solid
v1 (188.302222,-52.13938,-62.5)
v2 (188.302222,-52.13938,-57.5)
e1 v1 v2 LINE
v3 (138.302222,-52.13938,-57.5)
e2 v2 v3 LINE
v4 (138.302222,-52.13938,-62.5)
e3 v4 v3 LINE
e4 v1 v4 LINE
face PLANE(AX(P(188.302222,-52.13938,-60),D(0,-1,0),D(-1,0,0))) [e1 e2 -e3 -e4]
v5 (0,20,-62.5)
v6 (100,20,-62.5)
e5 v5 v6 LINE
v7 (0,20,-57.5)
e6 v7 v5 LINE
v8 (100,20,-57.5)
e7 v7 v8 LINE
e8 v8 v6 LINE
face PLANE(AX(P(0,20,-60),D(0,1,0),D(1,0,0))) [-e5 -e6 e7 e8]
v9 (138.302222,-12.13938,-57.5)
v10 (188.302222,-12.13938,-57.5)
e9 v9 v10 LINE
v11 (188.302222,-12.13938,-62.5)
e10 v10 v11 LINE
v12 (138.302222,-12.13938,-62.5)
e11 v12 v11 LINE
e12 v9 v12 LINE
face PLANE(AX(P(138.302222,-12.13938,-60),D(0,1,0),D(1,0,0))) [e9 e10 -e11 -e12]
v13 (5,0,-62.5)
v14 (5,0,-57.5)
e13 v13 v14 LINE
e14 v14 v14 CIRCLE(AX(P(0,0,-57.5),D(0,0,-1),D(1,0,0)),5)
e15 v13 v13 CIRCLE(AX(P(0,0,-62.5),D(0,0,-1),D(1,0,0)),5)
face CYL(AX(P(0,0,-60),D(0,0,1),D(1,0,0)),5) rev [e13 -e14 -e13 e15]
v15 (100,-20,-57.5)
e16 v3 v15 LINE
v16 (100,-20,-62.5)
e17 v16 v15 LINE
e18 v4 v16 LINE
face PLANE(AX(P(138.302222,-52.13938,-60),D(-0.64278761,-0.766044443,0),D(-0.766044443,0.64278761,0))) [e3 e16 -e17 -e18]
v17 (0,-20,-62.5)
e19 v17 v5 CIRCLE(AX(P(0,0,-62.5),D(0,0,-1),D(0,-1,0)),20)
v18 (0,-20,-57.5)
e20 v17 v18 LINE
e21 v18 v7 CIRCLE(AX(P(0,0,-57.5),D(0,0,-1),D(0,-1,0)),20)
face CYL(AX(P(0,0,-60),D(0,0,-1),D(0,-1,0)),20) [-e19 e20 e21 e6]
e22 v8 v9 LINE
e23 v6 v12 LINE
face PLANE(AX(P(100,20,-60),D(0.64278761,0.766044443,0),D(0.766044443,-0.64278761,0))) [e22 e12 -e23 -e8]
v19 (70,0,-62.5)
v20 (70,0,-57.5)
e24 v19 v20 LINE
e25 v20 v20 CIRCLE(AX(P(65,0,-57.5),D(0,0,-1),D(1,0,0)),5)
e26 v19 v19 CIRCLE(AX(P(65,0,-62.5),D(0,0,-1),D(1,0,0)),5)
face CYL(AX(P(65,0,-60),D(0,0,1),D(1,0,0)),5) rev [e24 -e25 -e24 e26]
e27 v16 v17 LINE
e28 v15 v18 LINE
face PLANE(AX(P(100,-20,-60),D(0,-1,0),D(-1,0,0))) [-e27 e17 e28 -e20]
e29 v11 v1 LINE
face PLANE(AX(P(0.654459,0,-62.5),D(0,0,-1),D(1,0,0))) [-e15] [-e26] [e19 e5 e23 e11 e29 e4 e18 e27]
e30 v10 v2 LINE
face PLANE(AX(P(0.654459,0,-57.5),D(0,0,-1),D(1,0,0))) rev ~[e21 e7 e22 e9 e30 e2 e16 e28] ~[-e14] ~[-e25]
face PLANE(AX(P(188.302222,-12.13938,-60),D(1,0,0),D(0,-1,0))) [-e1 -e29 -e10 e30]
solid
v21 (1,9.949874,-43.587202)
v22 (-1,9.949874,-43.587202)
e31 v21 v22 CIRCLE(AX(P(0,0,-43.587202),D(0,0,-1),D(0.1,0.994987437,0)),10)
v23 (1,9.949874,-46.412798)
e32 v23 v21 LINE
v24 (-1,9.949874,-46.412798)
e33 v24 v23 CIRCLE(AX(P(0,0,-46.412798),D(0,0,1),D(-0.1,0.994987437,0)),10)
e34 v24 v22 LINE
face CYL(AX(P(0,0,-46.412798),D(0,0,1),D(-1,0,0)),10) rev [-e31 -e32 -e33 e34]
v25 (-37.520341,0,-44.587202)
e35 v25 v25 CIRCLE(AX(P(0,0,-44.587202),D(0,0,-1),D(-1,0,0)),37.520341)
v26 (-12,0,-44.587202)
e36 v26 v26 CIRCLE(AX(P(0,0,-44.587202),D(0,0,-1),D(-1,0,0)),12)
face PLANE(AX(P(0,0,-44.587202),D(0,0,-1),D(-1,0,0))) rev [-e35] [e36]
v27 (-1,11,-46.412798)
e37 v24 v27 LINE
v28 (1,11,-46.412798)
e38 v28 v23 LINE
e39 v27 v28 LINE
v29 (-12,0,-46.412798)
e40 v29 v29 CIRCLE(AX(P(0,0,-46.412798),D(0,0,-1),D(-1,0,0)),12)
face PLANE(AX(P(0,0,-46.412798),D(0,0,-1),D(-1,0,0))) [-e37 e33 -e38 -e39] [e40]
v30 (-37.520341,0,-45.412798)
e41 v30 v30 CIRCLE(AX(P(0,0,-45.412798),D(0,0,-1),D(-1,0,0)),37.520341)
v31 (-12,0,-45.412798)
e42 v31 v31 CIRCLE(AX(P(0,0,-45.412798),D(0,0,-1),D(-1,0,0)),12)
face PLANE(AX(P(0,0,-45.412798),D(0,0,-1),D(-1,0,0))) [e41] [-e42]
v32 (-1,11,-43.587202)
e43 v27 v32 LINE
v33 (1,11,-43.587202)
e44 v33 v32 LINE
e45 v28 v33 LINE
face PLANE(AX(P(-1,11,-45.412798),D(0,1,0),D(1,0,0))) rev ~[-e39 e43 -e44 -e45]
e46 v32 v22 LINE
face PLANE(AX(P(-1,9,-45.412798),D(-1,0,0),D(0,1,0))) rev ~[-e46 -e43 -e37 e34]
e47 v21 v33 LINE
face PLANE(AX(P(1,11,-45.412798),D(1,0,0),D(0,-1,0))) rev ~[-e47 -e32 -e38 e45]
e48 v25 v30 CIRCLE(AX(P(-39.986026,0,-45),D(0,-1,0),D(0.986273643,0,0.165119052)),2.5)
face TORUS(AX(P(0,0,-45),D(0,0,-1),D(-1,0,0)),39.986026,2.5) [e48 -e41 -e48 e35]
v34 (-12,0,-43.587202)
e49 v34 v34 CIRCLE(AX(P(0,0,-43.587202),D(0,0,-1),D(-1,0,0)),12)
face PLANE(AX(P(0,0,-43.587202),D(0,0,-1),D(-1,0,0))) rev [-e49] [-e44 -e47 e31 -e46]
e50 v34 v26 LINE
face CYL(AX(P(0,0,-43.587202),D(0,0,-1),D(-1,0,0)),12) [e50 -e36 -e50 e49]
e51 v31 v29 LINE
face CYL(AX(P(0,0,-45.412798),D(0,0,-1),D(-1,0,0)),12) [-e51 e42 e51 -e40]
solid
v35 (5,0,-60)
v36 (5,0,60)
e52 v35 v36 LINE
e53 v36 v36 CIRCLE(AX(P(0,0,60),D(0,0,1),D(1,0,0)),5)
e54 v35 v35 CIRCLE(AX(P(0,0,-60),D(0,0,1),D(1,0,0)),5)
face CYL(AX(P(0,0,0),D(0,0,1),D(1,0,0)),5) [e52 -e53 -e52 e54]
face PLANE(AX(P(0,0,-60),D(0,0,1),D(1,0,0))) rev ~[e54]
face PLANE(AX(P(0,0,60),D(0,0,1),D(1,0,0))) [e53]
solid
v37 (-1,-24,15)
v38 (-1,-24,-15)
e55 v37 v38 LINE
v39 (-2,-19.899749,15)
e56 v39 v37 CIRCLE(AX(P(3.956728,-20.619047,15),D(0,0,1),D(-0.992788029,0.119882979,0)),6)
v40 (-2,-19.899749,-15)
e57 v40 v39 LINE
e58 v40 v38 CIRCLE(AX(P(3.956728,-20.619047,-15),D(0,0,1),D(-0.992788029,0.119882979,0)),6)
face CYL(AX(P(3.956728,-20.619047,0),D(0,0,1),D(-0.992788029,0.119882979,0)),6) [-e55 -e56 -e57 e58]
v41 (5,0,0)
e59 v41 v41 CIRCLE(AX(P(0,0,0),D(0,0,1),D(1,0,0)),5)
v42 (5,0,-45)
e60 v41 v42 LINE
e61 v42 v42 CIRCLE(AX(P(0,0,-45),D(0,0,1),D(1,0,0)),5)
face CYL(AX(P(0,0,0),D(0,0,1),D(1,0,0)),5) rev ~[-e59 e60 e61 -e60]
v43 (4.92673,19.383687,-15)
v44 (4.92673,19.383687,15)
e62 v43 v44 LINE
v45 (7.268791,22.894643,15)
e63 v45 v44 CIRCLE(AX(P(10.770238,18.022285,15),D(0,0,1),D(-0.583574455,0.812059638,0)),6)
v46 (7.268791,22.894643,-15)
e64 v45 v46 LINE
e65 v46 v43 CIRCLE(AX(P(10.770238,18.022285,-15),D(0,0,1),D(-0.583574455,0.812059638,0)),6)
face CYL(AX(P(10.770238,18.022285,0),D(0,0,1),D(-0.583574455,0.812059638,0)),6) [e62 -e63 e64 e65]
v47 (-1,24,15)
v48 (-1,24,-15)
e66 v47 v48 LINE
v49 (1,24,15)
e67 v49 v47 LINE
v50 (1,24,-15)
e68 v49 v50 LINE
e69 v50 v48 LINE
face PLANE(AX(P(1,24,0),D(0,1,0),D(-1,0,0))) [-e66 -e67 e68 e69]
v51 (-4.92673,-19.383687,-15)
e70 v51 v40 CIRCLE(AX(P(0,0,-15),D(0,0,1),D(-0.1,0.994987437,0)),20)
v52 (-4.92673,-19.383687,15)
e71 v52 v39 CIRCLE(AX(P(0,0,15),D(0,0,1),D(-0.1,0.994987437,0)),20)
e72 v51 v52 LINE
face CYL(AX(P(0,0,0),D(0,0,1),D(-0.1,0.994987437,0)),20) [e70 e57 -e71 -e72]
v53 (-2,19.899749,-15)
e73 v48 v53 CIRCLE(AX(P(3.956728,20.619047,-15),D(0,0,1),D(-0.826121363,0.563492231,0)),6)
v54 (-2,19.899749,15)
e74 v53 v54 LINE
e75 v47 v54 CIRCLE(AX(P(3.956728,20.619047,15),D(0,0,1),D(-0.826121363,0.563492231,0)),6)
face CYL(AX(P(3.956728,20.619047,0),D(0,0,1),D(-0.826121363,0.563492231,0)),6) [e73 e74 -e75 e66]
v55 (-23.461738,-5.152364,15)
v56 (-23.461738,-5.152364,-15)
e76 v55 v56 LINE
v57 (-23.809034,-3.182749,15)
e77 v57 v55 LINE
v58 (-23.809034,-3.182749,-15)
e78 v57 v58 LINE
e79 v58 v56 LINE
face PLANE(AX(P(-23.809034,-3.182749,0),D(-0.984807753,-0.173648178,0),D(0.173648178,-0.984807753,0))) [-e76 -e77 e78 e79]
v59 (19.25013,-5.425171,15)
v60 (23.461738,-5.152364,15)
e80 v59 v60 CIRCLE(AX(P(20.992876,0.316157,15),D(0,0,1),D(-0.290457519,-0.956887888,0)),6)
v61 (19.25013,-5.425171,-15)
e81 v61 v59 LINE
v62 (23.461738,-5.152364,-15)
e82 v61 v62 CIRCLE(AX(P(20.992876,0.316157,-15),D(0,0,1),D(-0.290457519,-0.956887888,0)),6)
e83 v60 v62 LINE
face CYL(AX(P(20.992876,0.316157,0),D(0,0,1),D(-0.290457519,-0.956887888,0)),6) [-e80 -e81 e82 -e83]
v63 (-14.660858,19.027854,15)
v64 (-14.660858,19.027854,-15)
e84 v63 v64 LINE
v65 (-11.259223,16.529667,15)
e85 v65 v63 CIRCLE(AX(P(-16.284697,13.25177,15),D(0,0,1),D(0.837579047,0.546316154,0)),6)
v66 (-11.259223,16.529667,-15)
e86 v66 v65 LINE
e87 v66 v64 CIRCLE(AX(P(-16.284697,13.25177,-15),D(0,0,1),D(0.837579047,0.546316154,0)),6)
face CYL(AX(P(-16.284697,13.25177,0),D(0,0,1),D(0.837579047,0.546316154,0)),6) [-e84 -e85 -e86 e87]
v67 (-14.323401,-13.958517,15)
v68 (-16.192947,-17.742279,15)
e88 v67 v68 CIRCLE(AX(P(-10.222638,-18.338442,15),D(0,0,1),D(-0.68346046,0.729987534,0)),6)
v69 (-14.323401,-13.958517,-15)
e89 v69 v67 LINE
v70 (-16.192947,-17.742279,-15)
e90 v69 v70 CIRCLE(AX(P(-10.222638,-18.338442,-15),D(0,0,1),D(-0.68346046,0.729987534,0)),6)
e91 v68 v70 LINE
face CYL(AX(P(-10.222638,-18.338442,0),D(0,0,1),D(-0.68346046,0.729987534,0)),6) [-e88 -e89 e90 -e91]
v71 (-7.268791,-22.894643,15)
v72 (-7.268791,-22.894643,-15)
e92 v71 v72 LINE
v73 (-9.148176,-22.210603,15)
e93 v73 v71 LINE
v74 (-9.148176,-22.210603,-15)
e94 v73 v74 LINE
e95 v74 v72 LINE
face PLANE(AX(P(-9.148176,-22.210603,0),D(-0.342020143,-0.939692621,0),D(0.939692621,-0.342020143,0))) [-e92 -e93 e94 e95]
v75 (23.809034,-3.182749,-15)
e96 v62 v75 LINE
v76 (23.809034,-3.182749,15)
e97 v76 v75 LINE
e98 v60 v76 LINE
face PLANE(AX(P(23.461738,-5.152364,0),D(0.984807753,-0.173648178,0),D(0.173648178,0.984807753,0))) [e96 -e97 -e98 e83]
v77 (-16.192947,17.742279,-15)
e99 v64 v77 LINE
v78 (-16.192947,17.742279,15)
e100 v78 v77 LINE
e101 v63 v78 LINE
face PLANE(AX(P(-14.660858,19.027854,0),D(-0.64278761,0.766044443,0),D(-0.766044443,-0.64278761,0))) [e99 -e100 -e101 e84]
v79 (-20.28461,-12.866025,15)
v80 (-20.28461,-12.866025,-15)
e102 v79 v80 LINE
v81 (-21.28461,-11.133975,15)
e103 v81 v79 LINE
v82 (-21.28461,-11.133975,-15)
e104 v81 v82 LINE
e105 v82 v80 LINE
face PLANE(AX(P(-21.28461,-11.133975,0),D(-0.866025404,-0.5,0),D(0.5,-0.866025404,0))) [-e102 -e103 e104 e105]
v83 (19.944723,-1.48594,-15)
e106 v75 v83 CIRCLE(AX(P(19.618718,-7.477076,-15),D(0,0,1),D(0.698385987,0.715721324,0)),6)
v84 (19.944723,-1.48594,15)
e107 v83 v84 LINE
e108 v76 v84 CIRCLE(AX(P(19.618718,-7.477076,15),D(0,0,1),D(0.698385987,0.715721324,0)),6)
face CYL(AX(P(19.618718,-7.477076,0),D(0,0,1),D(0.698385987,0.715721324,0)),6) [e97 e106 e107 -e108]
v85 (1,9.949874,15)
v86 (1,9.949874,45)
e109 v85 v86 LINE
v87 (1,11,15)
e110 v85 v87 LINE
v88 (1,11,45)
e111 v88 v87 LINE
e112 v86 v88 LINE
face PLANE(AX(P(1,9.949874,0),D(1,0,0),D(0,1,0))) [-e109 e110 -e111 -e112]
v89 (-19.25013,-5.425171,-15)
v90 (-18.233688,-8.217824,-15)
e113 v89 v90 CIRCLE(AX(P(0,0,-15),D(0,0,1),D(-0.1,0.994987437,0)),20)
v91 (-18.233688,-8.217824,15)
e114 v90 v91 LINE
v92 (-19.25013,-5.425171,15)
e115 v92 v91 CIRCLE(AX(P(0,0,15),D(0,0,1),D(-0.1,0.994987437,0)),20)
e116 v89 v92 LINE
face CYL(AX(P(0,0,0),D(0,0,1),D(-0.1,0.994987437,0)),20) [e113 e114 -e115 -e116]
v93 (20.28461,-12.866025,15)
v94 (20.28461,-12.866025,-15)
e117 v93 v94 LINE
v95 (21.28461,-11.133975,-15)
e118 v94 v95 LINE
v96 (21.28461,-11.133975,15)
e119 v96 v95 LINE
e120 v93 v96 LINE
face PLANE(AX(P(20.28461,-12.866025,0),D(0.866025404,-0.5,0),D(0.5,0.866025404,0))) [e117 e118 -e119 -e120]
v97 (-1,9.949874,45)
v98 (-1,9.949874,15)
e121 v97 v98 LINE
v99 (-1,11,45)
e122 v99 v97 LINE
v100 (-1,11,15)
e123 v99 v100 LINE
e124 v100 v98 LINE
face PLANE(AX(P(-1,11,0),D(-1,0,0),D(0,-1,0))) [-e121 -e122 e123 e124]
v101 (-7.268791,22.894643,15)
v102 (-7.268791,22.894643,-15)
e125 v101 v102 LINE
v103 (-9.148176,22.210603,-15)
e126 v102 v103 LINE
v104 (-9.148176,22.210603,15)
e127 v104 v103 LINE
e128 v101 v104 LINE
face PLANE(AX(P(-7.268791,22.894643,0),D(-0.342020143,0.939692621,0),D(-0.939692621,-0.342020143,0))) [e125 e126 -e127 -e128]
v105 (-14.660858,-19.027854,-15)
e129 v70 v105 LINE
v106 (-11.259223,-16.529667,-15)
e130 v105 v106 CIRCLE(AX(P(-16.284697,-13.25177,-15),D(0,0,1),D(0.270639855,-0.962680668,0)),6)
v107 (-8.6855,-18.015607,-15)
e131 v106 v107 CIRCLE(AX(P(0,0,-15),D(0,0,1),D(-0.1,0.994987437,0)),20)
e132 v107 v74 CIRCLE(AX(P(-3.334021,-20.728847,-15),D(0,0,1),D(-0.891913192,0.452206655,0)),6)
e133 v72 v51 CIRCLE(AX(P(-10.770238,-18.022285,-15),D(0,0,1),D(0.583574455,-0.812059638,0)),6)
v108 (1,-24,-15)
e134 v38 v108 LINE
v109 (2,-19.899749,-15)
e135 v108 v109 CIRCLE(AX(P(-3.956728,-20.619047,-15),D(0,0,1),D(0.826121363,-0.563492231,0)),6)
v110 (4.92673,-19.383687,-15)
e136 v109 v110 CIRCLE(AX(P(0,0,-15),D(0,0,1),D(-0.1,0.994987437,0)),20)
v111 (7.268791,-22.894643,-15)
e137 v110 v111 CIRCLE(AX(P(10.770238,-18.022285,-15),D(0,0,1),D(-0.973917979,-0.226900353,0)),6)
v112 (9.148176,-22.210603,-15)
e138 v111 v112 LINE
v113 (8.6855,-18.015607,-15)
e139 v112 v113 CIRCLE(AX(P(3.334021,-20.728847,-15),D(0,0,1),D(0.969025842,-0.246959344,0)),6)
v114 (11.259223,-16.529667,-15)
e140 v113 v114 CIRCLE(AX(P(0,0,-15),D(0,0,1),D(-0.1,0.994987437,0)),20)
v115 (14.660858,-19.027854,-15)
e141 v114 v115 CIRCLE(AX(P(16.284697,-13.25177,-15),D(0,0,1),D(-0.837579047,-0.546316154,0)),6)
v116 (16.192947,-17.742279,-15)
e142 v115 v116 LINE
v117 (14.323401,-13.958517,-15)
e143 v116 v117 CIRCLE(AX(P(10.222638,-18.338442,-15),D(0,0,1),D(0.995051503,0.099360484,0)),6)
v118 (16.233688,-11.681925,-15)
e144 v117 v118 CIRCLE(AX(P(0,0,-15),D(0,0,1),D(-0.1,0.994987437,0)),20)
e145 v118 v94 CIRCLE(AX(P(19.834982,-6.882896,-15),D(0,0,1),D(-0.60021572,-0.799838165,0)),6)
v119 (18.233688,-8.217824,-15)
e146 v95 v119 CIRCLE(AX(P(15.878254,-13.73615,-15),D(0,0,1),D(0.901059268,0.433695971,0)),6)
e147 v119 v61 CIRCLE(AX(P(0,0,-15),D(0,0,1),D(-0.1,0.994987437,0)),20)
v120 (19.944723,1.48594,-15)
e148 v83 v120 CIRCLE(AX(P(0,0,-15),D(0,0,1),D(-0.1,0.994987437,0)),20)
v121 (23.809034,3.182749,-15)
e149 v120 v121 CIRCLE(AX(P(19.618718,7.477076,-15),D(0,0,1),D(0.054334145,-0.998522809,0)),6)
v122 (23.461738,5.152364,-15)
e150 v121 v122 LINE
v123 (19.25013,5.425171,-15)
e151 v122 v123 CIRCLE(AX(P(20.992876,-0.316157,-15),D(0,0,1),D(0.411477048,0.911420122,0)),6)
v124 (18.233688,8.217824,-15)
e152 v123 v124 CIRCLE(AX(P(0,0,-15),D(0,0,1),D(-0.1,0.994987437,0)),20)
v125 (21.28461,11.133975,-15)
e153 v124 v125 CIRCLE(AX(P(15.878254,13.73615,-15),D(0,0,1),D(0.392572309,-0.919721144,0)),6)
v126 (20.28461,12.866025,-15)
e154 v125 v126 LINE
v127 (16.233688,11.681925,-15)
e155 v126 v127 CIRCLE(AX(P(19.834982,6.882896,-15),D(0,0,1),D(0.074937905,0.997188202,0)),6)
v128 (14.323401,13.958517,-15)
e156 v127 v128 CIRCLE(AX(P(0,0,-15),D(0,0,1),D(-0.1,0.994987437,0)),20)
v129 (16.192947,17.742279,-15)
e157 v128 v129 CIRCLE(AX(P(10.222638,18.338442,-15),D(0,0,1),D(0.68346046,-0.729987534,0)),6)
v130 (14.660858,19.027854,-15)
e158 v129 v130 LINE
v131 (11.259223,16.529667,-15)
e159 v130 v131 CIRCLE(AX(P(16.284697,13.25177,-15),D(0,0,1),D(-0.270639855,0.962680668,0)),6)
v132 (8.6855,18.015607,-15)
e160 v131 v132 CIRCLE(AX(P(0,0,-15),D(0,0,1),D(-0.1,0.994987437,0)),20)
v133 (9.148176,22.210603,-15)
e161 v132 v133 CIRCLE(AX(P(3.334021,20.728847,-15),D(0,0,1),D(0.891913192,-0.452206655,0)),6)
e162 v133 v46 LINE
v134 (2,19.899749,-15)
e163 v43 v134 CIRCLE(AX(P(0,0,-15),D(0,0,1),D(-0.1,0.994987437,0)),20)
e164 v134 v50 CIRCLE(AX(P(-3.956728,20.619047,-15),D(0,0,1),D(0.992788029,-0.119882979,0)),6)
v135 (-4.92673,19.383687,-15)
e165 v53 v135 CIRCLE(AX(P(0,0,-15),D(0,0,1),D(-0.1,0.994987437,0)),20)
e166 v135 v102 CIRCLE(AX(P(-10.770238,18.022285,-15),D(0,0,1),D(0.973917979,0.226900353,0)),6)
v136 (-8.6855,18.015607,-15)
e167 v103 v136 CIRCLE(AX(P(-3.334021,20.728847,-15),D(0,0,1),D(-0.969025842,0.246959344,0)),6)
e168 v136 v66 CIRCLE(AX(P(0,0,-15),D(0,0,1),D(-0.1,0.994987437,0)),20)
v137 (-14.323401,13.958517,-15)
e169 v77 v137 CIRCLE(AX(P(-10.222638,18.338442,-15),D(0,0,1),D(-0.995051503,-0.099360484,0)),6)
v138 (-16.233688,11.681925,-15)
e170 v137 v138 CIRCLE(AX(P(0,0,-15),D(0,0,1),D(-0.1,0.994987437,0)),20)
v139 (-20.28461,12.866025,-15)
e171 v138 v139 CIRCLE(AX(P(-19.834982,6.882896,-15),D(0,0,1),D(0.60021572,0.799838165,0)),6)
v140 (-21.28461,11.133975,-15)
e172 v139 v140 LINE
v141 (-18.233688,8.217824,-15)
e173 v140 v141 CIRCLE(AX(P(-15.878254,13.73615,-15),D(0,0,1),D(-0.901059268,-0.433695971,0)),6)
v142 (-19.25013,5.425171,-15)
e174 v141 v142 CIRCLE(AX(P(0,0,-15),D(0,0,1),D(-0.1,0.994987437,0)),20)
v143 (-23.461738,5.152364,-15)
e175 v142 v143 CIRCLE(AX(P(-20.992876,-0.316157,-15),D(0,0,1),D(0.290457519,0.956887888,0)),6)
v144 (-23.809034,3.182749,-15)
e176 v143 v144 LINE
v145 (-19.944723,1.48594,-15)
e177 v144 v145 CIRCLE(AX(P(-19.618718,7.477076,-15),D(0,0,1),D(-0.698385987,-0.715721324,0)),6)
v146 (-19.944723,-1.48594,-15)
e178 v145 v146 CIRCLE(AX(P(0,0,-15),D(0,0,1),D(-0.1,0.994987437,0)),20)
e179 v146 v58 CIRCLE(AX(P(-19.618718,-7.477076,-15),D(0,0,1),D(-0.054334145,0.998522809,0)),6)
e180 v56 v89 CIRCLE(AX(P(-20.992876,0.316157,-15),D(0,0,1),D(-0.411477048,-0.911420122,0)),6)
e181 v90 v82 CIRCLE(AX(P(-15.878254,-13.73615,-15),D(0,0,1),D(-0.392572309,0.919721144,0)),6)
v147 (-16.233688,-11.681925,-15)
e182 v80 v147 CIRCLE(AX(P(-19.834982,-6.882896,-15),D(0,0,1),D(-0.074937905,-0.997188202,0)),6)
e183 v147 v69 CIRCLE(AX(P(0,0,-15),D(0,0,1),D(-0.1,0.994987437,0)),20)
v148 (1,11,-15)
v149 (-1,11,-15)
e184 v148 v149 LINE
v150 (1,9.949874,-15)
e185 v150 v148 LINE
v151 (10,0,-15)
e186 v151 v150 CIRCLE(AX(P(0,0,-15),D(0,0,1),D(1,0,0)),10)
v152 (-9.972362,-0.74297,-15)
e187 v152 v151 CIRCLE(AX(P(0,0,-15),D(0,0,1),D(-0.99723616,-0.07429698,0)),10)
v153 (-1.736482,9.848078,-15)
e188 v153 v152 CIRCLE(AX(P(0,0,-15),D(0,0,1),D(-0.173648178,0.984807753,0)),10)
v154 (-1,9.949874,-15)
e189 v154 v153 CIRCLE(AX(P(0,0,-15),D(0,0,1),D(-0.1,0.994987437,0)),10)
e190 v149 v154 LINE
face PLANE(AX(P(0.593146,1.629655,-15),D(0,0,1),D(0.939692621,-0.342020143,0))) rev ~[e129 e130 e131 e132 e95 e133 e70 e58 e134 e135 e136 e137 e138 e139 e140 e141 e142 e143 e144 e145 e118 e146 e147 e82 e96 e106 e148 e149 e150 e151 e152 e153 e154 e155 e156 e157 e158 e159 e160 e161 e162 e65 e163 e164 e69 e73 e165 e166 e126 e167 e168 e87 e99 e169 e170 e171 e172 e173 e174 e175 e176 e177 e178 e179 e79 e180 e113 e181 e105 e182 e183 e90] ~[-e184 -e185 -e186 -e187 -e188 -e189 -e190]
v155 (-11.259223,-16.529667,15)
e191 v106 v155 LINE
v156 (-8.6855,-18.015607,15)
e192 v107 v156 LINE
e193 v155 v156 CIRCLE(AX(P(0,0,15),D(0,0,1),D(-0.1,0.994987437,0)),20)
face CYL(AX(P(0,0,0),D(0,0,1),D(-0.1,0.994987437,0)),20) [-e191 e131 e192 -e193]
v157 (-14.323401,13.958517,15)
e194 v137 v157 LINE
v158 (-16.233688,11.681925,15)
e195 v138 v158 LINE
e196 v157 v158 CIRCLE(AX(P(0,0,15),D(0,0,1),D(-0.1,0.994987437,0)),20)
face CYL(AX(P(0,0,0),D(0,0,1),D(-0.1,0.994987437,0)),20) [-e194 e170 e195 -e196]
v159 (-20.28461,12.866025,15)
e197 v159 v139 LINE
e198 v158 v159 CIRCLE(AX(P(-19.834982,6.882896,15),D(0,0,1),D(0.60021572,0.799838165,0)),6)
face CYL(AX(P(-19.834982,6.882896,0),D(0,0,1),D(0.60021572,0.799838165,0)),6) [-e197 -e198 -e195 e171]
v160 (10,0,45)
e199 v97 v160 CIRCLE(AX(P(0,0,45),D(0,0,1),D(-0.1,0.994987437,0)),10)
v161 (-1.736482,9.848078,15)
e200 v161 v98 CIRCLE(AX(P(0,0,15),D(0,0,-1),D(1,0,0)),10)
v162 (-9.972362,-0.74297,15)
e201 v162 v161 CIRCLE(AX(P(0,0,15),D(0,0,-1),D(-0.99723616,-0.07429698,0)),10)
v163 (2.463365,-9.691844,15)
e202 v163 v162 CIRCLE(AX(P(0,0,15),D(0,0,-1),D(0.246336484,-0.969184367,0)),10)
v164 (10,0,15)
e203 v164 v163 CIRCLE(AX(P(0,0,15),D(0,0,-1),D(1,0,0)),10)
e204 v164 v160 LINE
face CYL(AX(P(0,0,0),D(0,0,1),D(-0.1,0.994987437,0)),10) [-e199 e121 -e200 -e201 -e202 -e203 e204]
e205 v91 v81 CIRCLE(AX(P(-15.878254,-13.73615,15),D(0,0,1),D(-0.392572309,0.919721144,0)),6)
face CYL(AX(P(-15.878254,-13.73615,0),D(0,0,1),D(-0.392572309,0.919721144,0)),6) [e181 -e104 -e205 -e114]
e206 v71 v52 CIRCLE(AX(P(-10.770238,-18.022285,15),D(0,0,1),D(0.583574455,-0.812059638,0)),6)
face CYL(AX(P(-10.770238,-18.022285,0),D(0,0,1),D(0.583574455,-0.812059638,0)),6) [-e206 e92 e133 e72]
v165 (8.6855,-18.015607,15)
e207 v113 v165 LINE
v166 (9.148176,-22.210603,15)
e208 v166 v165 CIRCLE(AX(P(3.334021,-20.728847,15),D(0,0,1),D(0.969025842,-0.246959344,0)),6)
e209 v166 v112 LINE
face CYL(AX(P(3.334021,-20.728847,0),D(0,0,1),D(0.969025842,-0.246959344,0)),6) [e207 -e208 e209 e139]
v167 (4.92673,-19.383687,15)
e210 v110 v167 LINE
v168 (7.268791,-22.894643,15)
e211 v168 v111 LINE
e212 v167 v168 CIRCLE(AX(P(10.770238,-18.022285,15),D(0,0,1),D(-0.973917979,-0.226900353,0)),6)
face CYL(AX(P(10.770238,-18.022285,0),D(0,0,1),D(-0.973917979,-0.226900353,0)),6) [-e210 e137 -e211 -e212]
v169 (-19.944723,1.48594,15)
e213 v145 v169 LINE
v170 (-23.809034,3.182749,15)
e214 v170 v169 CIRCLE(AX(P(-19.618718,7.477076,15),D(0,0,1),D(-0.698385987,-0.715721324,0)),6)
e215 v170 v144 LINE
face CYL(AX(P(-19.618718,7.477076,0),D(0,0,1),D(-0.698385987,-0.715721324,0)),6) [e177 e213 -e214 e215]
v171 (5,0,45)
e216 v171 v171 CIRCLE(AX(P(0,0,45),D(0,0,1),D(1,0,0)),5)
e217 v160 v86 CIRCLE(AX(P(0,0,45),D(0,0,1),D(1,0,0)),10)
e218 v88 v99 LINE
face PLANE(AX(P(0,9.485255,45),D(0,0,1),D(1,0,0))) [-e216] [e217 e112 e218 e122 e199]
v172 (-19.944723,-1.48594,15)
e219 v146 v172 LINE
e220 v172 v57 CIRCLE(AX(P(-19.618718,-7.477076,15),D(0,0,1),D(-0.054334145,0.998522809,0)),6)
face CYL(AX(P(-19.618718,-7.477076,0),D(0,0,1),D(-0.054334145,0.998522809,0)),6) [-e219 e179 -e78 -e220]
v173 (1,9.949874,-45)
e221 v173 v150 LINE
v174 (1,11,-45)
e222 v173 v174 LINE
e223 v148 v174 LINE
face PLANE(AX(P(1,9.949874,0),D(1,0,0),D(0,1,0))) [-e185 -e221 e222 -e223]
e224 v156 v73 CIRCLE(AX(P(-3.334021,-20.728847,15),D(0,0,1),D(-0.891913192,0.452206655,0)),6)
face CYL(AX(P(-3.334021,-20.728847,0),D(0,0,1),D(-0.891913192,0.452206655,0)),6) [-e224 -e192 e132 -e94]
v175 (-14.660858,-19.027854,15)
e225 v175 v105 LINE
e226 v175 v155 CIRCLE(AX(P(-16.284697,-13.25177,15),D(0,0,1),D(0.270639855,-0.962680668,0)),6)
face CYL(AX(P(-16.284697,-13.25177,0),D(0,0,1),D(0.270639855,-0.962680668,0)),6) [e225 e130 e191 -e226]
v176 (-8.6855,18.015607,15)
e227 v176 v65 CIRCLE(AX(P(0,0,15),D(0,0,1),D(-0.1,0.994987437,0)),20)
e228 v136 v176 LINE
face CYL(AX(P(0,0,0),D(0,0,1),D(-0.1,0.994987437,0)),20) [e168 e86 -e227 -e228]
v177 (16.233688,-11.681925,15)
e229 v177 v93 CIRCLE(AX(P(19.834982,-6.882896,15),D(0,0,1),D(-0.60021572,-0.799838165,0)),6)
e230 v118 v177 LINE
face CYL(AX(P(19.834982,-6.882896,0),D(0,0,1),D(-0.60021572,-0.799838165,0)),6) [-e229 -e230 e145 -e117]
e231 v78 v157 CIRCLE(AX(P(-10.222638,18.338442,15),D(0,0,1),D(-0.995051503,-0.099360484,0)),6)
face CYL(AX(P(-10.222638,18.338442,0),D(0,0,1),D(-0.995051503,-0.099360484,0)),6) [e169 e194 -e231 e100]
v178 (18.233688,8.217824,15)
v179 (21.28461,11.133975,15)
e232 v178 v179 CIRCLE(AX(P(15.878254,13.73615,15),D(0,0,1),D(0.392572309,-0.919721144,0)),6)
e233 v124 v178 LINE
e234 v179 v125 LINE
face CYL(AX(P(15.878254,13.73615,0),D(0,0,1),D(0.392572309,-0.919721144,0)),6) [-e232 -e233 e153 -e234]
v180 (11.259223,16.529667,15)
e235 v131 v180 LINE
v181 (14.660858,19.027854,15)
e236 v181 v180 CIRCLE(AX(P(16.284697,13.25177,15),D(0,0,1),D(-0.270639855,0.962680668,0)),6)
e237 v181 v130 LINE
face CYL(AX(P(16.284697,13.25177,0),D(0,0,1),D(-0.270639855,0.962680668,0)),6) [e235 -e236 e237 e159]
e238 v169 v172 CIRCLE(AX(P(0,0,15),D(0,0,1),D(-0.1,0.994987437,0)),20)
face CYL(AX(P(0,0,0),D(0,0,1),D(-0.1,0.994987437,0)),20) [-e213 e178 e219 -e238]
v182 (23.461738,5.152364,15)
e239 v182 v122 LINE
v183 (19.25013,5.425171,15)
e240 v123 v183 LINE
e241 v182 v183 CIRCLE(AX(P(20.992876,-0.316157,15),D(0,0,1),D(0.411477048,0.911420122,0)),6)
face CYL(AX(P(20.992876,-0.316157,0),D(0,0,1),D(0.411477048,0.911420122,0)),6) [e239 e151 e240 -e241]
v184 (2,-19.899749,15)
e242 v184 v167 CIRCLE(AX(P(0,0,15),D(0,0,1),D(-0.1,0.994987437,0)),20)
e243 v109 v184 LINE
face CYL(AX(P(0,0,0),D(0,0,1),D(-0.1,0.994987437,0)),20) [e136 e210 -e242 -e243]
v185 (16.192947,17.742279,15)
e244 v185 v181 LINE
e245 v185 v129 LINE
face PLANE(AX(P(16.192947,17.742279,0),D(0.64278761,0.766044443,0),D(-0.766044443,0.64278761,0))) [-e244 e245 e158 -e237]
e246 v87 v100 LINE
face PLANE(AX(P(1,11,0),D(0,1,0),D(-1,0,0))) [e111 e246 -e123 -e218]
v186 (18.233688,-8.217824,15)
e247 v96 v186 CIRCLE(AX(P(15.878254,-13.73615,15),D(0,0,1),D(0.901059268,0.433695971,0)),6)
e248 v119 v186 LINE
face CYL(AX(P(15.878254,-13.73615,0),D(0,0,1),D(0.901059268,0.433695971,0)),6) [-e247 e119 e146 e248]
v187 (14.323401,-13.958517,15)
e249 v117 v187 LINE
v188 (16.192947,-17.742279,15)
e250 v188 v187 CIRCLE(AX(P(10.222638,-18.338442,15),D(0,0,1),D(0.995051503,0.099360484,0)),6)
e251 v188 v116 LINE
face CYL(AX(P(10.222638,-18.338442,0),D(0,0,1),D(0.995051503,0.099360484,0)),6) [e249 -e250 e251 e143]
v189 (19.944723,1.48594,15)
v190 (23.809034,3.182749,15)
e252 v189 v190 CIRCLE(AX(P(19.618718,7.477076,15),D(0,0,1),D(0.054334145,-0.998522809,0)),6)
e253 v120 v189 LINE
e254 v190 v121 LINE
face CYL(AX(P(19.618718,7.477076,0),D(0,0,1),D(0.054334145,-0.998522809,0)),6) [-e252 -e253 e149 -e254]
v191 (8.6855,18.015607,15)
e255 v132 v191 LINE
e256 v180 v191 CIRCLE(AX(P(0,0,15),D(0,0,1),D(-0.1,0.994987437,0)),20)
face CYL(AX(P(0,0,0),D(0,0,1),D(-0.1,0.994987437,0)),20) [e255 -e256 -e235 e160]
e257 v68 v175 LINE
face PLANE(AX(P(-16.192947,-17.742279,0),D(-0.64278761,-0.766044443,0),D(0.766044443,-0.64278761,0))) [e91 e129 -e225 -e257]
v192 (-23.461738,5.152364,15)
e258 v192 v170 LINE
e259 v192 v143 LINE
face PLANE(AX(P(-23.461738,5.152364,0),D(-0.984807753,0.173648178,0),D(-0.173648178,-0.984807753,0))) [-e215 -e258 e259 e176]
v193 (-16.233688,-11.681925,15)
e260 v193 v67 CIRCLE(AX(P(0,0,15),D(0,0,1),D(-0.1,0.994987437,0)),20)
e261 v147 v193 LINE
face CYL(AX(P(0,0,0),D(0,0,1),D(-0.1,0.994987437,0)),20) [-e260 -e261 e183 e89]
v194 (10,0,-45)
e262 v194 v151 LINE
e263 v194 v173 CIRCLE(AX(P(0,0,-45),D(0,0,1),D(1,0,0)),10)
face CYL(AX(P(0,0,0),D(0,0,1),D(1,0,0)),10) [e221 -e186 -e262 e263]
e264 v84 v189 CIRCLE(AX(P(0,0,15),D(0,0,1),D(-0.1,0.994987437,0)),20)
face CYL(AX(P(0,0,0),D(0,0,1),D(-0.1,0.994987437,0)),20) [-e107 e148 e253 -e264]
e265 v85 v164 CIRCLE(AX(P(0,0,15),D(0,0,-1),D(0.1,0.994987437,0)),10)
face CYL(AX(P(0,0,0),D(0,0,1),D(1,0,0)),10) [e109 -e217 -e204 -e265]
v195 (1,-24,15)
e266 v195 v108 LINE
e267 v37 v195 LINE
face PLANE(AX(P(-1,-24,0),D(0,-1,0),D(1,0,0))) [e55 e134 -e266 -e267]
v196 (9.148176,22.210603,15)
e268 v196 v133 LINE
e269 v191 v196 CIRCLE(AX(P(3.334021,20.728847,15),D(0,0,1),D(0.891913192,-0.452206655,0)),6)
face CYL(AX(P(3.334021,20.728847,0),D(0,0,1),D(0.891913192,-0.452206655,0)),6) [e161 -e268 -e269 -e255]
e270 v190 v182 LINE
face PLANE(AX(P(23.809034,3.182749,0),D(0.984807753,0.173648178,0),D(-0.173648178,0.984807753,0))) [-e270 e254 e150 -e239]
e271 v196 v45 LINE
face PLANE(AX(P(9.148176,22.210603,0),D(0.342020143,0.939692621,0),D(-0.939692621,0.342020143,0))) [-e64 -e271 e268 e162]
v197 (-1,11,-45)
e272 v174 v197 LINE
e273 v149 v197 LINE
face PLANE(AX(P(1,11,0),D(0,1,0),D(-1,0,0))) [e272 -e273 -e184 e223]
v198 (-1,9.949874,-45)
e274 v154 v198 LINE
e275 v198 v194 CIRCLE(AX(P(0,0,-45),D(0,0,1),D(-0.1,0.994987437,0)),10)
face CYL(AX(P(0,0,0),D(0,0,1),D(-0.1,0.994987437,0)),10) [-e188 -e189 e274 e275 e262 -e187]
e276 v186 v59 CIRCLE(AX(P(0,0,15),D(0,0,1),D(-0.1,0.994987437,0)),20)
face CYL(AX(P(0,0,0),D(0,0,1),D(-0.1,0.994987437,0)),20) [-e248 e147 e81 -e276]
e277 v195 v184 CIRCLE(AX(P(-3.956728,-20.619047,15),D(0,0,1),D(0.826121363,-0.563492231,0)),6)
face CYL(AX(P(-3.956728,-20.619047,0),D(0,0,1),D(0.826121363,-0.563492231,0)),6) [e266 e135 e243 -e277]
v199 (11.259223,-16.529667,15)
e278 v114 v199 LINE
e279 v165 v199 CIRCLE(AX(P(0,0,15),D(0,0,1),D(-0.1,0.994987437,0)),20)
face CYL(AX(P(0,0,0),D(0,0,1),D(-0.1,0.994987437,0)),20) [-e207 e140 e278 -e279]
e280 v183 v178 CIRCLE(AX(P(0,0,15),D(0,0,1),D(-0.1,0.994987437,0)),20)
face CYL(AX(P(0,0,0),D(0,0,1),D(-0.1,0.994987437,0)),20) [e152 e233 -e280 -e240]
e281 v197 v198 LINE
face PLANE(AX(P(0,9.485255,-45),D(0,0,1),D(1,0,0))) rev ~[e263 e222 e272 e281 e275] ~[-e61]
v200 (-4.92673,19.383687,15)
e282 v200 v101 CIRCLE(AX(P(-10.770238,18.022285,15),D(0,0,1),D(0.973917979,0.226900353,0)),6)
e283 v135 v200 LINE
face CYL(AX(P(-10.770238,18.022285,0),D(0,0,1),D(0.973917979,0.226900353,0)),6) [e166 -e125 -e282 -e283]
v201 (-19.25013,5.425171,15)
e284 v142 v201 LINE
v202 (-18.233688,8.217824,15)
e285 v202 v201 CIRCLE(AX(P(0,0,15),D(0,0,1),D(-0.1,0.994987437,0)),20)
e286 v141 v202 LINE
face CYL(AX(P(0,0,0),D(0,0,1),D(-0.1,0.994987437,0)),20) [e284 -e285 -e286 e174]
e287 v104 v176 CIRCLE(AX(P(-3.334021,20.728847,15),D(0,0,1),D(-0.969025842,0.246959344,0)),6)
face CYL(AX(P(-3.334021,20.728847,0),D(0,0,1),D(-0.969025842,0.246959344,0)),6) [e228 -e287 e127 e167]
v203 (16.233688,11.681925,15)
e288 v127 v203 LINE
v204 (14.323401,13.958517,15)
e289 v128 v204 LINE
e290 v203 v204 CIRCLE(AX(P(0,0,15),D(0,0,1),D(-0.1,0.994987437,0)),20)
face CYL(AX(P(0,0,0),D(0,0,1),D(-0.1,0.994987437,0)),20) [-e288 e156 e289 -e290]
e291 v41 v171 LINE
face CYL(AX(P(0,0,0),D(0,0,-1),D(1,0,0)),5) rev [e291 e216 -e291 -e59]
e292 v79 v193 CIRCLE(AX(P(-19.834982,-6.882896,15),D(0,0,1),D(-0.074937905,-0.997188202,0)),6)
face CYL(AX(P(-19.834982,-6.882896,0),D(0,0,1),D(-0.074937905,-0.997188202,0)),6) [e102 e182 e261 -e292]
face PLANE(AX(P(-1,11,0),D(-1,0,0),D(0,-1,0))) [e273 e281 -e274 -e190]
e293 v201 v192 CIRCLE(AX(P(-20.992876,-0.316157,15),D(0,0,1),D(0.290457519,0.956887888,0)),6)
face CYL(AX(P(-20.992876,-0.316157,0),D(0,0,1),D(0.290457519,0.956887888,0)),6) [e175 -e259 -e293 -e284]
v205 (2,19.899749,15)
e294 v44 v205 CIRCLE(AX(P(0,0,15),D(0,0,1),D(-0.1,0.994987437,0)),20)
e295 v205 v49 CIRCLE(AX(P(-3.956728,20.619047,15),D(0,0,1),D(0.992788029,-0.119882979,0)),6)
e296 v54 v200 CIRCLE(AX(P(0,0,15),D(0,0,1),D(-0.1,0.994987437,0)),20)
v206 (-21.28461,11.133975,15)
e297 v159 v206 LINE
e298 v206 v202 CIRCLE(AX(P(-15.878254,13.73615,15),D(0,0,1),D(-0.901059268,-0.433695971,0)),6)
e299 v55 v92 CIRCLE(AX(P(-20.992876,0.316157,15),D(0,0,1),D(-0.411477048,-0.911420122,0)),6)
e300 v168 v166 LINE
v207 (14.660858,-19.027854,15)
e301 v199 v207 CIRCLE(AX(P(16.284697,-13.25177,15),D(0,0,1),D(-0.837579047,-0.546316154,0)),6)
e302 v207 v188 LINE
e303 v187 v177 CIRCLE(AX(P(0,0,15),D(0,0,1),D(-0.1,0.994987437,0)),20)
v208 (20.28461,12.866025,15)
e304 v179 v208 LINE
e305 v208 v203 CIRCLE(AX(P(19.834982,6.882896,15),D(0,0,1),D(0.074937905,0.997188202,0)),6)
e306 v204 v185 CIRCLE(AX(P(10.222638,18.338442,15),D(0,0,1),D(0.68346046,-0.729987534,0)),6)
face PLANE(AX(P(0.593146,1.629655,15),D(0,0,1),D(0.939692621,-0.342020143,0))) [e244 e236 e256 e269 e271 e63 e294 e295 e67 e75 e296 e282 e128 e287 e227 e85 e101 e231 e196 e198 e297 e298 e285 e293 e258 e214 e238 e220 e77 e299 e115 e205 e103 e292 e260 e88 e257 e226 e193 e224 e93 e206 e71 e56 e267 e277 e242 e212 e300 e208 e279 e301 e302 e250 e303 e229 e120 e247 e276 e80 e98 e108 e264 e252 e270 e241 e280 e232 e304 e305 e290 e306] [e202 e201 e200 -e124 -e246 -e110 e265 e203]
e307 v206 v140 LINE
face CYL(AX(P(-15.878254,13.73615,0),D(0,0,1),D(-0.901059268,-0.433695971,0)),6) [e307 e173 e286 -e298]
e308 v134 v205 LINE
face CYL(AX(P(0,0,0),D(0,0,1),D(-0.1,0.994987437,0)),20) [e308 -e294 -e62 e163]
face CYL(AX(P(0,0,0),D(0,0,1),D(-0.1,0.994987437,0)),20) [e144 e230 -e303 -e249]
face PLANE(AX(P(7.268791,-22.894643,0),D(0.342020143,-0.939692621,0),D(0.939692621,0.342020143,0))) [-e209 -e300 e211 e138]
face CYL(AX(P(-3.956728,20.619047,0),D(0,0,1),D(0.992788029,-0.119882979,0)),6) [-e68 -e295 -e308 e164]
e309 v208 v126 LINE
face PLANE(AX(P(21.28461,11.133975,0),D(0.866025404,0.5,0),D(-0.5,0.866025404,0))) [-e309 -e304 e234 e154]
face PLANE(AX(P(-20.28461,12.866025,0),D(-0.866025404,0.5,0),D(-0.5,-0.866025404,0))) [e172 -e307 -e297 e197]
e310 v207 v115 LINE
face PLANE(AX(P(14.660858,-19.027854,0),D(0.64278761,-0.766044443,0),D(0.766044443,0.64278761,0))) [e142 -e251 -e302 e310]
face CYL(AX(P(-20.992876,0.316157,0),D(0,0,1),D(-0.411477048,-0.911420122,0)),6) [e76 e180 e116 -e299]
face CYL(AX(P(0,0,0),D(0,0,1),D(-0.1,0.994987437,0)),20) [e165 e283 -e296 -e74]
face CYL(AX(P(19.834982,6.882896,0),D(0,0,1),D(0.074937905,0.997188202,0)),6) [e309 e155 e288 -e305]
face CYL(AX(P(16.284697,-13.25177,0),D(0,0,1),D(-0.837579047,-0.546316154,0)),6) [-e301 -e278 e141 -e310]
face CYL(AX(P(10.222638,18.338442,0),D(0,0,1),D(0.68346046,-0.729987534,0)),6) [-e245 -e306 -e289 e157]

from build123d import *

# Parameters (mm, degrees)
F1_DEPTH  = 15
F0_R      = 5
F2_DEPTH  = 60
F3_COUNT  = 18
F4_DEPTH  = 45
F9_DEPTH  = 3.9
F10_R     = 5
F11_DEPTH = 2.5


with BuildPart() as f1:
    # F0 (on Top) → F1 (new body, symmetric)
    with BuildSketch(Plane.XY):
        with BuildLine():
            ThreePointArc((-1, 24), (-1.8724139119, 22.0407014664), (-2, 19.8997487421))
            ThreePointArc((-2, 19.8997487421), (0, -20), (2, 19.8997487421))
            ThreePointArc((2, 19.8997487421), (1.8724139119, 22.0407014664), (1, 24))
            Line((1, 24), (-1, 24))
        make_face()
        with BuildLine():
            ThreePointArc((1, 9.9498743711), (7.4161984871, 6.7082039325), (10, 0))
            ThreePointArc((10, 0), (-6.7082039325, -7.4161984871), (-1, 9.9498743711))
            Line((-1, 9.9498743711), (-1, 11))
            Line((-1, 11), (1, 11))
            Line((1, 11), (1, 9.9498743711))
        make_face(mode=Mode.SUBTRACT)
    extrude(amount=F1_DEPTH, both=True)

    # F3: F1 ×18 about axis
    f3_axis = Axis((0, 0, 0), (0, 0, 1))


with BuildPart() as f2:
    # F0 (on Top) → F2 (new body, symmetric)
    with BuildSketch(Plane.XY):
        Circle(F0_R)
    extrude(amount=F2_DEPTH, both=True)


with BuildPart() as f1_1:
    add(f1.part)
    for i in range(1, F3_COUNT):
        add(f1.part.rotate(f3_axis, i * 360 / F3_COUNT))

    # F0 (on Top) → F4 (join, symmetric)
    with BuildSketch(Plane.XY):
        with BuildLine():
            Line((1, 9), (1, 9.9498743711))
            ThreePointArc((1, 9.9498743711), (0, 10), (-1, 9.9498743711))
            Line((-1, 9.9498743711), (-1, 9))
            Line((-1, 9), (1, 9))
        make_face()
        with BuildLine():
            ThreePointArc((-1, 9.9498743711), (-6.7082039325, -7.4161984871), (10, 0))
            ThreePointArc((10, 0), (7.4161984871, 6.7082039325), (1, 9.9498743711))
            Line((1, 9.9498743711), (1, 9))
            Line((1, 9), (-1, 9))
            Line((-1, 9), (-1, 9.9498743711))
        make_face()
        Circle(F0_R, mode=Mode.SUBTRACT)
        with BuildLine():
            ThreePointArc((-1, 9.9498743711), (0, 10), (1, 9.9498743711))
            Line((1, 9.9498743711), (1, 11))
            Line((1, 11), (-1, 11))
            Line((-1, 11), (-1, 9.9498743711))
        make_face()
        with BuildLine():
            ThreePointArc((-1, 9.9498743711), (-6.7082039325, -7.4161984871), (10, 0))
            ThreePointArc((10, 0), (7.4161984871, 6.7082039325), (1, 9.9498743711))
            Line((1, 9.9498743711), (1, 9))
            Line((1, 9), (-1, 9))
            Line((-1, 9), (-1, 9.9498743711))
        make_face()
        Circle(F0_R, mode=Mode.SUBTRACT)
    extrude(amount=F4_DEPTH, both=True)


with BuildPart() as f7:
    # F6 (on Front) → F7 (revolve)
    with BuildSketch(Plane.XZ):
        with BuildLine():
            ThreePointArc((-37.5203414348, -45.4127976298), (-37.4946192857, -45.2071107576), (-37.486025542, -45))
            ThreePointArc((-37.486025542, -45), (-37.4946192857, -44.7928892424), (-37.5203414348, -44.5872023702))
            ThreePointArc((-37.5203414348, -44.5872023702), (-42.486025542, -45), (-37.5203414348, -45.4127976298))
        make_face()
        with BuildLine():
            ThreePointArc((-37.5203414348, -44.5872023702), (-37.4946192857, -44.7928892424), (-37.486025542, -45))
            ThreePointArc((-37.486025542, -45), (-37.4946192857, -45.2071107576), (-37.5203414348, -45.4127976298))
            Line((-37.5203414348, -45.4127976298), (-12, -45.4127976298))
            Line((-12, -45.4127976298), (-12, -46.4127976298))
            Line((-12, -46.4127976298), (-10, -46.4127976298))
            Line((-10, -46.4127976298), (-10, -45))
            Line((-10, -45), (-10, -43.5872023702))
            Line((-10, -43.5872023702), (-12, -43.5872023702))
            Line((-12, -43.5872023702), (-12, -44.5872023702))
            Line((-12, -44.5872023702), (-37.5203414348, -44.5872023702))
        make_face()
    revolve(axis=Axis((0, 0, -45), (0, 0, -1)))

    # F8 (on face) → F9 (cut, symmetric)
    with BuildSketch(Plane(origin=(0, 0, -45.4127976298), x_dir=(1, 0, 0), z_dir=(0, 0, -1))):
        Polygon((1, -11), (1, -9.9498743711), (1, -9), (-1, -9), (-1, -9.9498743711), (-1, -11), align=None)
    extrude(amount=F9_DEPTH, both=True, mode=Mode.SUBTRACT)


with BuildPart() as f11:
    # F10 (on face) → F11 (new body, symmetric)
    with BuildSketch(Plane(origin=(0, 0, -60), x_dir=(1, 0, 0), z_dir=(0, 0, -1))):
        with BuildLine():
            ThreePointArc((0, -20), (14.1421356237, -14.1421356237), (20, 0))
            ThreePointArc((20, 0), (14.1421356237, 14.1421356237), (0, 20))
            ThreePointArc((0, 20), (-20, 0), (0, -20))
        make_face()
        Circle(F10_R, mode=Mode.SUBTRACT)
        with BuildLine():
            ThreePointArc((0, 20), (14.1421356237, 14.1421356237), (20, 0))
            ThreePointArc((20, 0), (14.1421356237, -14.1421356237), (0, -20))
            Line((0, -20), (100, -20))
            Line((100, -20), (138.3022221559, 12.1393804843))
            Line((138.3022221559, 12.1393804843), (188.3022221559, 12.1393804843))
            Line((188.3022221559, 12.1393804843), (188.3022221559, 52.1393804843))
            Line((188.3022221559, 52.1393804843), (138.3022221559, 52.1393804843))
            Line((138.3022221559, 52.1393804843), (100, 20))
            Line((100, 20), (0, 20))
        make_face()
        with Locations((65, 0)):
            Circle(F10_R, mode=Mode.SUBTRACT)
    extrude(amount=F11_DEPTH, both=True)


solid = Compound([f2.part, f1_1.part, f7.part, f11.part])
